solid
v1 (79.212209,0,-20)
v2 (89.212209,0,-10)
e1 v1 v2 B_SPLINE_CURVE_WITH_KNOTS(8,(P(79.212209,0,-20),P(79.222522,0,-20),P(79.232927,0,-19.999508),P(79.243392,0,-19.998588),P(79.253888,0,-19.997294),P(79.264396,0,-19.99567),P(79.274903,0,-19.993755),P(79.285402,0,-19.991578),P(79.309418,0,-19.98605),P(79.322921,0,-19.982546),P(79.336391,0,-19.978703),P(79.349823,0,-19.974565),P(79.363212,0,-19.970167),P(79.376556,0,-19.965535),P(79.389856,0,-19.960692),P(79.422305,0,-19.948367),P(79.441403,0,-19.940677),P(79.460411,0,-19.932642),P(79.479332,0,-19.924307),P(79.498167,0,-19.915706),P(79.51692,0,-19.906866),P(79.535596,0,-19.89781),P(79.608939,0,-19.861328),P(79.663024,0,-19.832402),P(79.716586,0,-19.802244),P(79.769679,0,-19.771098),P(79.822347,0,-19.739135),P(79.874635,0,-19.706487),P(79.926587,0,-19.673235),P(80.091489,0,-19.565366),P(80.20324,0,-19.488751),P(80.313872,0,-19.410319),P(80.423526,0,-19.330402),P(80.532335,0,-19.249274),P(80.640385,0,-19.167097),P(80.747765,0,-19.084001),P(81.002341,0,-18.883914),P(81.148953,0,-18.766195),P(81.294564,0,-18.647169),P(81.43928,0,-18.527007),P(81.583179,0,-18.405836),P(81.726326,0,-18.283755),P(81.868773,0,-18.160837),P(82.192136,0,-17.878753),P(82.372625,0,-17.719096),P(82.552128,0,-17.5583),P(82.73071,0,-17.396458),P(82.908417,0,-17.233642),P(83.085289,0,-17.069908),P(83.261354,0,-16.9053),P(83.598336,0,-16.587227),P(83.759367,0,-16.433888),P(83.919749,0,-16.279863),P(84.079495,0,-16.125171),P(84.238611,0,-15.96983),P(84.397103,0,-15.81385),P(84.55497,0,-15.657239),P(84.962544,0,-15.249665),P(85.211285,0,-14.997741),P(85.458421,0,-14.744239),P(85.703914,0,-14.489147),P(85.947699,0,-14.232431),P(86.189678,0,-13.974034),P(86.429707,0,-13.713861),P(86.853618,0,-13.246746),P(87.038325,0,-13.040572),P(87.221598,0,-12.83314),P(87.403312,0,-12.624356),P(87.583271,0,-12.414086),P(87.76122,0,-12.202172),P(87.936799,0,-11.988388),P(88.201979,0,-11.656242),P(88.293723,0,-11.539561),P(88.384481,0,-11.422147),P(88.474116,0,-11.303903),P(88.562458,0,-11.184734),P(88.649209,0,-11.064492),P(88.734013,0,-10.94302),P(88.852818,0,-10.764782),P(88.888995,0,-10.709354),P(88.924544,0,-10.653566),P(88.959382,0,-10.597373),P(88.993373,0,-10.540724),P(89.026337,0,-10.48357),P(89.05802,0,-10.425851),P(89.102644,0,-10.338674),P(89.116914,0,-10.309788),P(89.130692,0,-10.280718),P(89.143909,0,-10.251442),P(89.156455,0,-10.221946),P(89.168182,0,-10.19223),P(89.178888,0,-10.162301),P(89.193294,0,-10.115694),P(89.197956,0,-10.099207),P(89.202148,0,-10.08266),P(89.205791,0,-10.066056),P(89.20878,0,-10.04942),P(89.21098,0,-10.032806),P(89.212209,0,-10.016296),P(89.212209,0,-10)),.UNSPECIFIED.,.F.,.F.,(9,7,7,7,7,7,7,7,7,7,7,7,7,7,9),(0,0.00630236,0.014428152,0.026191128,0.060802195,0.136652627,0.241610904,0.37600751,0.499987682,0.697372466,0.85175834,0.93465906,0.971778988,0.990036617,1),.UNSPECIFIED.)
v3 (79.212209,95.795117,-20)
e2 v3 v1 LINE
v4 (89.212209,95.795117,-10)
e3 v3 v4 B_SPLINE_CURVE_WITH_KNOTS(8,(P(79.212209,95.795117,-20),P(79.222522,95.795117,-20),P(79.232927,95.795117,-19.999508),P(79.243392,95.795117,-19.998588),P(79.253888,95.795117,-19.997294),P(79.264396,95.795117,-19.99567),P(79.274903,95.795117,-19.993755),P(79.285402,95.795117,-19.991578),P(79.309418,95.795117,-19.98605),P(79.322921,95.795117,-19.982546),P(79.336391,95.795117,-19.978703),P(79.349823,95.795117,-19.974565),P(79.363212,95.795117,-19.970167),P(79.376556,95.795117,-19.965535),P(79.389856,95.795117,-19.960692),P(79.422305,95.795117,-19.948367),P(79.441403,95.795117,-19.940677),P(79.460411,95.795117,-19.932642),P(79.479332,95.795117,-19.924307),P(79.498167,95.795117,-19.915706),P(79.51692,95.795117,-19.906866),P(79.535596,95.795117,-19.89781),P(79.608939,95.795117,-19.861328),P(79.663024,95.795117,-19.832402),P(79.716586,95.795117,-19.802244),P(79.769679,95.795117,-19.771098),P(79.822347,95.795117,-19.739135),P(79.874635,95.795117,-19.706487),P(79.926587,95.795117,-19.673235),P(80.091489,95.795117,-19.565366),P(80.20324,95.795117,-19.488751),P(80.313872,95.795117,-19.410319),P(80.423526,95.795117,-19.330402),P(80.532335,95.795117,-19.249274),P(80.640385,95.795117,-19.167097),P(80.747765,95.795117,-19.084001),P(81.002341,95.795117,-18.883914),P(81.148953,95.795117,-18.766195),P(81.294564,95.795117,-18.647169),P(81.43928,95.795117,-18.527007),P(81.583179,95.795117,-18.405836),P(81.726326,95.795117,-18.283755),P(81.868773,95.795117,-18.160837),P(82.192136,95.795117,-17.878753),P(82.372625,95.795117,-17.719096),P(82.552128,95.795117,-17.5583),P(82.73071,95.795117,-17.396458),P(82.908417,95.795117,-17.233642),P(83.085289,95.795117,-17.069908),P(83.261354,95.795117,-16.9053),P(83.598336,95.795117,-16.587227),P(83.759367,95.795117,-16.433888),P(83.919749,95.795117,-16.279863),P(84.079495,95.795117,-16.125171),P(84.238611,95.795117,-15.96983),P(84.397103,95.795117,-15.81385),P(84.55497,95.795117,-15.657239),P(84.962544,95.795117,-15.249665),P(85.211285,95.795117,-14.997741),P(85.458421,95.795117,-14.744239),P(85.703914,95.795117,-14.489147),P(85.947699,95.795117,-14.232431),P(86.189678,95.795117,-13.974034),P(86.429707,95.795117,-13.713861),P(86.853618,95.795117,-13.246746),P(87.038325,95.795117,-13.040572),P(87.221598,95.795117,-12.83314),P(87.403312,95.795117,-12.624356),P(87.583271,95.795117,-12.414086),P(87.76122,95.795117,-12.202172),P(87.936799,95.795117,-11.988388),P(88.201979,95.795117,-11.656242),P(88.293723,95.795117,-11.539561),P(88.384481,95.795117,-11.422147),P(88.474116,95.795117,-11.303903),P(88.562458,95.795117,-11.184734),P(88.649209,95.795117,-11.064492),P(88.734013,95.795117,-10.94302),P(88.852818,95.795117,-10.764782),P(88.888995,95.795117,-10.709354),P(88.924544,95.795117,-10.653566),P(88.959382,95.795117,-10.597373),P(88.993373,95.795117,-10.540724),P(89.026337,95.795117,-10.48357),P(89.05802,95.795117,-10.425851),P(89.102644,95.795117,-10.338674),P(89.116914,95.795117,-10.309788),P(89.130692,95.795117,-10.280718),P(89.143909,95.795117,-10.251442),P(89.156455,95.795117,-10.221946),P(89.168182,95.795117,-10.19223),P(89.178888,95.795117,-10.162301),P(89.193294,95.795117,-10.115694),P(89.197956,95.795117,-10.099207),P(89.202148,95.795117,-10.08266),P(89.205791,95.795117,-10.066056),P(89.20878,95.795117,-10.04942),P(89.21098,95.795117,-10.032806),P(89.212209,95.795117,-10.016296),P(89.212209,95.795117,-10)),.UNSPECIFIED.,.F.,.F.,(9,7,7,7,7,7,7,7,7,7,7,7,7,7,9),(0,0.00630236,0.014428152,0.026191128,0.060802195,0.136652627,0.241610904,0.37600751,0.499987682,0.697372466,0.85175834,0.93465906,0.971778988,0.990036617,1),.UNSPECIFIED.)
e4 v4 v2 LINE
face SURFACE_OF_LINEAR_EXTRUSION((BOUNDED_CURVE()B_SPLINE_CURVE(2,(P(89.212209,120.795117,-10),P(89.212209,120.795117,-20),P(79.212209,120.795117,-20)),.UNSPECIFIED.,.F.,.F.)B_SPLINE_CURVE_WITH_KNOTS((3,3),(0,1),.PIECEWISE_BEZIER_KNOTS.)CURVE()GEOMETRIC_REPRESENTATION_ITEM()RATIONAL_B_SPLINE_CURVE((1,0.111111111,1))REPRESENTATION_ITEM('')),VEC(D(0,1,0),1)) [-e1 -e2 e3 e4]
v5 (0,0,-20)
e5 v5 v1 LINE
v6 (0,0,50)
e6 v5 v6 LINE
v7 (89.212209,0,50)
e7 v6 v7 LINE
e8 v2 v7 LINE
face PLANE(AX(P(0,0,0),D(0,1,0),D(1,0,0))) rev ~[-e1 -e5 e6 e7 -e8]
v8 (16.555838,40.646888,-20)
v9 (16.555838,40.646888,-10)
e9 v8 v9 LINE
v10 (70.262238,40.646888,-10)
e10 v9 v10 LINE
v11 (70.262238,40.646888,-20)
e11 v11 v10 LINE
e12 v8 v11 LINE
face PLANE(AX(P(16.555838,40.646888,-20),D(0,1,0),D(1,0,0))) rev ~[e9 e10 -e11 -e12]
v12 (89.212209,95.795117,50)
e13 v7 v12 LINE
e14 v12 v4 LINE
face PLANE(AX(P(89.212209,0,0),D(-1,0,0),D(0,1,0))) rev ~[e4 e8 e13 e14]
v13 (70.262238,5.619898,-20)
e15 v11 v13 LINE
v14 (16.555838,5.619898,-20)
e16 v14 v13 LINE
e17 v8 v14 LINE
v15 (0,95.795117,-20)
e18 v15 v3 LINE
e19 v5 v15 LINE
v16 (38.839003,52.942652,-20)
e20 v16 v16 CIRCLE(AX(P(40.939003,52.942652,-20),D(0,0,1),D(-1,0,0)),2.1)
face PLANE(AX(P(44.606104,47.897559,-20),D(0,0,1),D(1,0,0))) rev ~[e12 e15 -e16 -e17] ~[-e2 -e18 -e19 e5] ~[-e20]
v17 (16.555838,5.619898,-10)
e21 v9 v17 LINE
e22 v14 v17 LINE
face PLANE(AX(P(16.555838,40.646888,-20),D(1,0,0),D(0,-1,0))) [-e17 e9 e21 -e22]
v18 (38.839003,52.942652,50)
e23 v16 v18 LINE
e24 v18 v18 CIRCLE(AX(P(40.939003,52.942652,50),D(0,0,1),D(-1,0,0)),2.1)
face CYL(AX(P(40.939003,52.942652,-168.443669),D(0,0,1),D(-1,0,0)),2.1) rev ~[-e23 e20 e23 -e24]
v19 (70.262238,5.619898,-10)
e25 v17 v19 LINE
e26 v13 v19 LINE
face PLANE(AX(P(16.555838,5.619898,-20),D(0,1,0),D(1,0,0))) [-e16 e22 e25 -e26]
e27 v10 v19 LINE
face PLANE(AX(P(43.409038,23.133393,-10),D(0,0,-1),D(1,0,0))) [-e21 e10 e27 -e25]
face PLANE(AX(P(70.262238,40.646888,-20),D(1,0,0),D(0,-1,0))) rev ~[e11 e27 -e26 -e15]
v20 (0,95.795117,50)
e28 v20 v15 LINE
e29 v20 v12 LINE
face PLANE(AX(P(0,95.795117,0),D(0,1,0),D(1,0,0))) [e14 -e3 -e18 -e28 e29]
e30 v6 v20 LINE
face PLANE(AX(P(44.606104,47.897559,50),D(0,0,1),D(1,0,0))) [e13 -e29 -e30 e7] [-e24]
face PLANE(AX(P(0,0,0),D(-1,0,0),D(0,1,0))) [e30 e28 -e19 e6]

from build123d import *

# Parameters (mm, degrees)
F0_W          = 89.2122089863
F0_H          = 95.7951173186
F1_DEPTH      = 20
F1_DEPTH_BACK = 50
F2_T1_DEPTH   = 145.7951173186
F4_D          = 4.2
F5_W          = 53.7064000964
F5_H          = 35.0269903429
F6_DEPTH      = 10


# Not quite as in the source:
# - a fillet or chamfer that OpenCascade refuses, or shapes differently, is made with other operations: its cross-section is extruded or revolved along the edge and cut away or added


with BuildPart() as f1:
    # F0 (on Top) → F1 (new body, two sides)
    with BuildSketch(Plane.XY) as f1_sk:
        with Locations((44.6061044931, 47.8975586593)):
            Rectangle(F0_W, F0_H)
    extrude(amount=-F1_DEPTH)
    extrude(f1_sk.sketch, amount=F1_DEPTH_BACK)

    # F2: fillet of radius 10 on 1 edges, made by hand

    # F2_s2 → F2_t1 (cut)
    with BuildSketch(Plane.XZ.offset(-120.7951173186)):
        with BuildLine():
            add(Edge.make_bspline(
                [(89.2122089863, -10), (89.2122089863, -20), (79.2122089863, -20)],
                knots=[0, 0, 0, 1, 1, 1], degree=2, weights=[1, 0.1111111111, 1]))
            Line((79.2122089863, -20), (89.2122089863, -20))
            Line((89.2122089863, -20), (89.2122089863, -10))
        make_face()
    extrude(amount=F2_T1_DEPTH, mode=Mode.SUBTRACT)

    # F4 (through all)
    with Locations(Plane(origin=(0, 0, -20), x_dir=(1, 0, 0), z_dir=(0, 0, -1))):
        with Locations((40.9390032291, -52.9426522553)):
            Hole(F4_D / 2)

    # F5 (on face) → F6 (cut)
    with BuildSketch(Plane(origin=(0, 0, -20), x_dir=(1, 0, 0), z_dir=(0, 0, -1))):
        with Locations((43.4090383351, -23.1333931442)):
            Rectangle(F5_W, F5_H)
    extrude(amount=-F6_DEPTH, mode=Mode.SUBTRACT)


solid = f1.part
